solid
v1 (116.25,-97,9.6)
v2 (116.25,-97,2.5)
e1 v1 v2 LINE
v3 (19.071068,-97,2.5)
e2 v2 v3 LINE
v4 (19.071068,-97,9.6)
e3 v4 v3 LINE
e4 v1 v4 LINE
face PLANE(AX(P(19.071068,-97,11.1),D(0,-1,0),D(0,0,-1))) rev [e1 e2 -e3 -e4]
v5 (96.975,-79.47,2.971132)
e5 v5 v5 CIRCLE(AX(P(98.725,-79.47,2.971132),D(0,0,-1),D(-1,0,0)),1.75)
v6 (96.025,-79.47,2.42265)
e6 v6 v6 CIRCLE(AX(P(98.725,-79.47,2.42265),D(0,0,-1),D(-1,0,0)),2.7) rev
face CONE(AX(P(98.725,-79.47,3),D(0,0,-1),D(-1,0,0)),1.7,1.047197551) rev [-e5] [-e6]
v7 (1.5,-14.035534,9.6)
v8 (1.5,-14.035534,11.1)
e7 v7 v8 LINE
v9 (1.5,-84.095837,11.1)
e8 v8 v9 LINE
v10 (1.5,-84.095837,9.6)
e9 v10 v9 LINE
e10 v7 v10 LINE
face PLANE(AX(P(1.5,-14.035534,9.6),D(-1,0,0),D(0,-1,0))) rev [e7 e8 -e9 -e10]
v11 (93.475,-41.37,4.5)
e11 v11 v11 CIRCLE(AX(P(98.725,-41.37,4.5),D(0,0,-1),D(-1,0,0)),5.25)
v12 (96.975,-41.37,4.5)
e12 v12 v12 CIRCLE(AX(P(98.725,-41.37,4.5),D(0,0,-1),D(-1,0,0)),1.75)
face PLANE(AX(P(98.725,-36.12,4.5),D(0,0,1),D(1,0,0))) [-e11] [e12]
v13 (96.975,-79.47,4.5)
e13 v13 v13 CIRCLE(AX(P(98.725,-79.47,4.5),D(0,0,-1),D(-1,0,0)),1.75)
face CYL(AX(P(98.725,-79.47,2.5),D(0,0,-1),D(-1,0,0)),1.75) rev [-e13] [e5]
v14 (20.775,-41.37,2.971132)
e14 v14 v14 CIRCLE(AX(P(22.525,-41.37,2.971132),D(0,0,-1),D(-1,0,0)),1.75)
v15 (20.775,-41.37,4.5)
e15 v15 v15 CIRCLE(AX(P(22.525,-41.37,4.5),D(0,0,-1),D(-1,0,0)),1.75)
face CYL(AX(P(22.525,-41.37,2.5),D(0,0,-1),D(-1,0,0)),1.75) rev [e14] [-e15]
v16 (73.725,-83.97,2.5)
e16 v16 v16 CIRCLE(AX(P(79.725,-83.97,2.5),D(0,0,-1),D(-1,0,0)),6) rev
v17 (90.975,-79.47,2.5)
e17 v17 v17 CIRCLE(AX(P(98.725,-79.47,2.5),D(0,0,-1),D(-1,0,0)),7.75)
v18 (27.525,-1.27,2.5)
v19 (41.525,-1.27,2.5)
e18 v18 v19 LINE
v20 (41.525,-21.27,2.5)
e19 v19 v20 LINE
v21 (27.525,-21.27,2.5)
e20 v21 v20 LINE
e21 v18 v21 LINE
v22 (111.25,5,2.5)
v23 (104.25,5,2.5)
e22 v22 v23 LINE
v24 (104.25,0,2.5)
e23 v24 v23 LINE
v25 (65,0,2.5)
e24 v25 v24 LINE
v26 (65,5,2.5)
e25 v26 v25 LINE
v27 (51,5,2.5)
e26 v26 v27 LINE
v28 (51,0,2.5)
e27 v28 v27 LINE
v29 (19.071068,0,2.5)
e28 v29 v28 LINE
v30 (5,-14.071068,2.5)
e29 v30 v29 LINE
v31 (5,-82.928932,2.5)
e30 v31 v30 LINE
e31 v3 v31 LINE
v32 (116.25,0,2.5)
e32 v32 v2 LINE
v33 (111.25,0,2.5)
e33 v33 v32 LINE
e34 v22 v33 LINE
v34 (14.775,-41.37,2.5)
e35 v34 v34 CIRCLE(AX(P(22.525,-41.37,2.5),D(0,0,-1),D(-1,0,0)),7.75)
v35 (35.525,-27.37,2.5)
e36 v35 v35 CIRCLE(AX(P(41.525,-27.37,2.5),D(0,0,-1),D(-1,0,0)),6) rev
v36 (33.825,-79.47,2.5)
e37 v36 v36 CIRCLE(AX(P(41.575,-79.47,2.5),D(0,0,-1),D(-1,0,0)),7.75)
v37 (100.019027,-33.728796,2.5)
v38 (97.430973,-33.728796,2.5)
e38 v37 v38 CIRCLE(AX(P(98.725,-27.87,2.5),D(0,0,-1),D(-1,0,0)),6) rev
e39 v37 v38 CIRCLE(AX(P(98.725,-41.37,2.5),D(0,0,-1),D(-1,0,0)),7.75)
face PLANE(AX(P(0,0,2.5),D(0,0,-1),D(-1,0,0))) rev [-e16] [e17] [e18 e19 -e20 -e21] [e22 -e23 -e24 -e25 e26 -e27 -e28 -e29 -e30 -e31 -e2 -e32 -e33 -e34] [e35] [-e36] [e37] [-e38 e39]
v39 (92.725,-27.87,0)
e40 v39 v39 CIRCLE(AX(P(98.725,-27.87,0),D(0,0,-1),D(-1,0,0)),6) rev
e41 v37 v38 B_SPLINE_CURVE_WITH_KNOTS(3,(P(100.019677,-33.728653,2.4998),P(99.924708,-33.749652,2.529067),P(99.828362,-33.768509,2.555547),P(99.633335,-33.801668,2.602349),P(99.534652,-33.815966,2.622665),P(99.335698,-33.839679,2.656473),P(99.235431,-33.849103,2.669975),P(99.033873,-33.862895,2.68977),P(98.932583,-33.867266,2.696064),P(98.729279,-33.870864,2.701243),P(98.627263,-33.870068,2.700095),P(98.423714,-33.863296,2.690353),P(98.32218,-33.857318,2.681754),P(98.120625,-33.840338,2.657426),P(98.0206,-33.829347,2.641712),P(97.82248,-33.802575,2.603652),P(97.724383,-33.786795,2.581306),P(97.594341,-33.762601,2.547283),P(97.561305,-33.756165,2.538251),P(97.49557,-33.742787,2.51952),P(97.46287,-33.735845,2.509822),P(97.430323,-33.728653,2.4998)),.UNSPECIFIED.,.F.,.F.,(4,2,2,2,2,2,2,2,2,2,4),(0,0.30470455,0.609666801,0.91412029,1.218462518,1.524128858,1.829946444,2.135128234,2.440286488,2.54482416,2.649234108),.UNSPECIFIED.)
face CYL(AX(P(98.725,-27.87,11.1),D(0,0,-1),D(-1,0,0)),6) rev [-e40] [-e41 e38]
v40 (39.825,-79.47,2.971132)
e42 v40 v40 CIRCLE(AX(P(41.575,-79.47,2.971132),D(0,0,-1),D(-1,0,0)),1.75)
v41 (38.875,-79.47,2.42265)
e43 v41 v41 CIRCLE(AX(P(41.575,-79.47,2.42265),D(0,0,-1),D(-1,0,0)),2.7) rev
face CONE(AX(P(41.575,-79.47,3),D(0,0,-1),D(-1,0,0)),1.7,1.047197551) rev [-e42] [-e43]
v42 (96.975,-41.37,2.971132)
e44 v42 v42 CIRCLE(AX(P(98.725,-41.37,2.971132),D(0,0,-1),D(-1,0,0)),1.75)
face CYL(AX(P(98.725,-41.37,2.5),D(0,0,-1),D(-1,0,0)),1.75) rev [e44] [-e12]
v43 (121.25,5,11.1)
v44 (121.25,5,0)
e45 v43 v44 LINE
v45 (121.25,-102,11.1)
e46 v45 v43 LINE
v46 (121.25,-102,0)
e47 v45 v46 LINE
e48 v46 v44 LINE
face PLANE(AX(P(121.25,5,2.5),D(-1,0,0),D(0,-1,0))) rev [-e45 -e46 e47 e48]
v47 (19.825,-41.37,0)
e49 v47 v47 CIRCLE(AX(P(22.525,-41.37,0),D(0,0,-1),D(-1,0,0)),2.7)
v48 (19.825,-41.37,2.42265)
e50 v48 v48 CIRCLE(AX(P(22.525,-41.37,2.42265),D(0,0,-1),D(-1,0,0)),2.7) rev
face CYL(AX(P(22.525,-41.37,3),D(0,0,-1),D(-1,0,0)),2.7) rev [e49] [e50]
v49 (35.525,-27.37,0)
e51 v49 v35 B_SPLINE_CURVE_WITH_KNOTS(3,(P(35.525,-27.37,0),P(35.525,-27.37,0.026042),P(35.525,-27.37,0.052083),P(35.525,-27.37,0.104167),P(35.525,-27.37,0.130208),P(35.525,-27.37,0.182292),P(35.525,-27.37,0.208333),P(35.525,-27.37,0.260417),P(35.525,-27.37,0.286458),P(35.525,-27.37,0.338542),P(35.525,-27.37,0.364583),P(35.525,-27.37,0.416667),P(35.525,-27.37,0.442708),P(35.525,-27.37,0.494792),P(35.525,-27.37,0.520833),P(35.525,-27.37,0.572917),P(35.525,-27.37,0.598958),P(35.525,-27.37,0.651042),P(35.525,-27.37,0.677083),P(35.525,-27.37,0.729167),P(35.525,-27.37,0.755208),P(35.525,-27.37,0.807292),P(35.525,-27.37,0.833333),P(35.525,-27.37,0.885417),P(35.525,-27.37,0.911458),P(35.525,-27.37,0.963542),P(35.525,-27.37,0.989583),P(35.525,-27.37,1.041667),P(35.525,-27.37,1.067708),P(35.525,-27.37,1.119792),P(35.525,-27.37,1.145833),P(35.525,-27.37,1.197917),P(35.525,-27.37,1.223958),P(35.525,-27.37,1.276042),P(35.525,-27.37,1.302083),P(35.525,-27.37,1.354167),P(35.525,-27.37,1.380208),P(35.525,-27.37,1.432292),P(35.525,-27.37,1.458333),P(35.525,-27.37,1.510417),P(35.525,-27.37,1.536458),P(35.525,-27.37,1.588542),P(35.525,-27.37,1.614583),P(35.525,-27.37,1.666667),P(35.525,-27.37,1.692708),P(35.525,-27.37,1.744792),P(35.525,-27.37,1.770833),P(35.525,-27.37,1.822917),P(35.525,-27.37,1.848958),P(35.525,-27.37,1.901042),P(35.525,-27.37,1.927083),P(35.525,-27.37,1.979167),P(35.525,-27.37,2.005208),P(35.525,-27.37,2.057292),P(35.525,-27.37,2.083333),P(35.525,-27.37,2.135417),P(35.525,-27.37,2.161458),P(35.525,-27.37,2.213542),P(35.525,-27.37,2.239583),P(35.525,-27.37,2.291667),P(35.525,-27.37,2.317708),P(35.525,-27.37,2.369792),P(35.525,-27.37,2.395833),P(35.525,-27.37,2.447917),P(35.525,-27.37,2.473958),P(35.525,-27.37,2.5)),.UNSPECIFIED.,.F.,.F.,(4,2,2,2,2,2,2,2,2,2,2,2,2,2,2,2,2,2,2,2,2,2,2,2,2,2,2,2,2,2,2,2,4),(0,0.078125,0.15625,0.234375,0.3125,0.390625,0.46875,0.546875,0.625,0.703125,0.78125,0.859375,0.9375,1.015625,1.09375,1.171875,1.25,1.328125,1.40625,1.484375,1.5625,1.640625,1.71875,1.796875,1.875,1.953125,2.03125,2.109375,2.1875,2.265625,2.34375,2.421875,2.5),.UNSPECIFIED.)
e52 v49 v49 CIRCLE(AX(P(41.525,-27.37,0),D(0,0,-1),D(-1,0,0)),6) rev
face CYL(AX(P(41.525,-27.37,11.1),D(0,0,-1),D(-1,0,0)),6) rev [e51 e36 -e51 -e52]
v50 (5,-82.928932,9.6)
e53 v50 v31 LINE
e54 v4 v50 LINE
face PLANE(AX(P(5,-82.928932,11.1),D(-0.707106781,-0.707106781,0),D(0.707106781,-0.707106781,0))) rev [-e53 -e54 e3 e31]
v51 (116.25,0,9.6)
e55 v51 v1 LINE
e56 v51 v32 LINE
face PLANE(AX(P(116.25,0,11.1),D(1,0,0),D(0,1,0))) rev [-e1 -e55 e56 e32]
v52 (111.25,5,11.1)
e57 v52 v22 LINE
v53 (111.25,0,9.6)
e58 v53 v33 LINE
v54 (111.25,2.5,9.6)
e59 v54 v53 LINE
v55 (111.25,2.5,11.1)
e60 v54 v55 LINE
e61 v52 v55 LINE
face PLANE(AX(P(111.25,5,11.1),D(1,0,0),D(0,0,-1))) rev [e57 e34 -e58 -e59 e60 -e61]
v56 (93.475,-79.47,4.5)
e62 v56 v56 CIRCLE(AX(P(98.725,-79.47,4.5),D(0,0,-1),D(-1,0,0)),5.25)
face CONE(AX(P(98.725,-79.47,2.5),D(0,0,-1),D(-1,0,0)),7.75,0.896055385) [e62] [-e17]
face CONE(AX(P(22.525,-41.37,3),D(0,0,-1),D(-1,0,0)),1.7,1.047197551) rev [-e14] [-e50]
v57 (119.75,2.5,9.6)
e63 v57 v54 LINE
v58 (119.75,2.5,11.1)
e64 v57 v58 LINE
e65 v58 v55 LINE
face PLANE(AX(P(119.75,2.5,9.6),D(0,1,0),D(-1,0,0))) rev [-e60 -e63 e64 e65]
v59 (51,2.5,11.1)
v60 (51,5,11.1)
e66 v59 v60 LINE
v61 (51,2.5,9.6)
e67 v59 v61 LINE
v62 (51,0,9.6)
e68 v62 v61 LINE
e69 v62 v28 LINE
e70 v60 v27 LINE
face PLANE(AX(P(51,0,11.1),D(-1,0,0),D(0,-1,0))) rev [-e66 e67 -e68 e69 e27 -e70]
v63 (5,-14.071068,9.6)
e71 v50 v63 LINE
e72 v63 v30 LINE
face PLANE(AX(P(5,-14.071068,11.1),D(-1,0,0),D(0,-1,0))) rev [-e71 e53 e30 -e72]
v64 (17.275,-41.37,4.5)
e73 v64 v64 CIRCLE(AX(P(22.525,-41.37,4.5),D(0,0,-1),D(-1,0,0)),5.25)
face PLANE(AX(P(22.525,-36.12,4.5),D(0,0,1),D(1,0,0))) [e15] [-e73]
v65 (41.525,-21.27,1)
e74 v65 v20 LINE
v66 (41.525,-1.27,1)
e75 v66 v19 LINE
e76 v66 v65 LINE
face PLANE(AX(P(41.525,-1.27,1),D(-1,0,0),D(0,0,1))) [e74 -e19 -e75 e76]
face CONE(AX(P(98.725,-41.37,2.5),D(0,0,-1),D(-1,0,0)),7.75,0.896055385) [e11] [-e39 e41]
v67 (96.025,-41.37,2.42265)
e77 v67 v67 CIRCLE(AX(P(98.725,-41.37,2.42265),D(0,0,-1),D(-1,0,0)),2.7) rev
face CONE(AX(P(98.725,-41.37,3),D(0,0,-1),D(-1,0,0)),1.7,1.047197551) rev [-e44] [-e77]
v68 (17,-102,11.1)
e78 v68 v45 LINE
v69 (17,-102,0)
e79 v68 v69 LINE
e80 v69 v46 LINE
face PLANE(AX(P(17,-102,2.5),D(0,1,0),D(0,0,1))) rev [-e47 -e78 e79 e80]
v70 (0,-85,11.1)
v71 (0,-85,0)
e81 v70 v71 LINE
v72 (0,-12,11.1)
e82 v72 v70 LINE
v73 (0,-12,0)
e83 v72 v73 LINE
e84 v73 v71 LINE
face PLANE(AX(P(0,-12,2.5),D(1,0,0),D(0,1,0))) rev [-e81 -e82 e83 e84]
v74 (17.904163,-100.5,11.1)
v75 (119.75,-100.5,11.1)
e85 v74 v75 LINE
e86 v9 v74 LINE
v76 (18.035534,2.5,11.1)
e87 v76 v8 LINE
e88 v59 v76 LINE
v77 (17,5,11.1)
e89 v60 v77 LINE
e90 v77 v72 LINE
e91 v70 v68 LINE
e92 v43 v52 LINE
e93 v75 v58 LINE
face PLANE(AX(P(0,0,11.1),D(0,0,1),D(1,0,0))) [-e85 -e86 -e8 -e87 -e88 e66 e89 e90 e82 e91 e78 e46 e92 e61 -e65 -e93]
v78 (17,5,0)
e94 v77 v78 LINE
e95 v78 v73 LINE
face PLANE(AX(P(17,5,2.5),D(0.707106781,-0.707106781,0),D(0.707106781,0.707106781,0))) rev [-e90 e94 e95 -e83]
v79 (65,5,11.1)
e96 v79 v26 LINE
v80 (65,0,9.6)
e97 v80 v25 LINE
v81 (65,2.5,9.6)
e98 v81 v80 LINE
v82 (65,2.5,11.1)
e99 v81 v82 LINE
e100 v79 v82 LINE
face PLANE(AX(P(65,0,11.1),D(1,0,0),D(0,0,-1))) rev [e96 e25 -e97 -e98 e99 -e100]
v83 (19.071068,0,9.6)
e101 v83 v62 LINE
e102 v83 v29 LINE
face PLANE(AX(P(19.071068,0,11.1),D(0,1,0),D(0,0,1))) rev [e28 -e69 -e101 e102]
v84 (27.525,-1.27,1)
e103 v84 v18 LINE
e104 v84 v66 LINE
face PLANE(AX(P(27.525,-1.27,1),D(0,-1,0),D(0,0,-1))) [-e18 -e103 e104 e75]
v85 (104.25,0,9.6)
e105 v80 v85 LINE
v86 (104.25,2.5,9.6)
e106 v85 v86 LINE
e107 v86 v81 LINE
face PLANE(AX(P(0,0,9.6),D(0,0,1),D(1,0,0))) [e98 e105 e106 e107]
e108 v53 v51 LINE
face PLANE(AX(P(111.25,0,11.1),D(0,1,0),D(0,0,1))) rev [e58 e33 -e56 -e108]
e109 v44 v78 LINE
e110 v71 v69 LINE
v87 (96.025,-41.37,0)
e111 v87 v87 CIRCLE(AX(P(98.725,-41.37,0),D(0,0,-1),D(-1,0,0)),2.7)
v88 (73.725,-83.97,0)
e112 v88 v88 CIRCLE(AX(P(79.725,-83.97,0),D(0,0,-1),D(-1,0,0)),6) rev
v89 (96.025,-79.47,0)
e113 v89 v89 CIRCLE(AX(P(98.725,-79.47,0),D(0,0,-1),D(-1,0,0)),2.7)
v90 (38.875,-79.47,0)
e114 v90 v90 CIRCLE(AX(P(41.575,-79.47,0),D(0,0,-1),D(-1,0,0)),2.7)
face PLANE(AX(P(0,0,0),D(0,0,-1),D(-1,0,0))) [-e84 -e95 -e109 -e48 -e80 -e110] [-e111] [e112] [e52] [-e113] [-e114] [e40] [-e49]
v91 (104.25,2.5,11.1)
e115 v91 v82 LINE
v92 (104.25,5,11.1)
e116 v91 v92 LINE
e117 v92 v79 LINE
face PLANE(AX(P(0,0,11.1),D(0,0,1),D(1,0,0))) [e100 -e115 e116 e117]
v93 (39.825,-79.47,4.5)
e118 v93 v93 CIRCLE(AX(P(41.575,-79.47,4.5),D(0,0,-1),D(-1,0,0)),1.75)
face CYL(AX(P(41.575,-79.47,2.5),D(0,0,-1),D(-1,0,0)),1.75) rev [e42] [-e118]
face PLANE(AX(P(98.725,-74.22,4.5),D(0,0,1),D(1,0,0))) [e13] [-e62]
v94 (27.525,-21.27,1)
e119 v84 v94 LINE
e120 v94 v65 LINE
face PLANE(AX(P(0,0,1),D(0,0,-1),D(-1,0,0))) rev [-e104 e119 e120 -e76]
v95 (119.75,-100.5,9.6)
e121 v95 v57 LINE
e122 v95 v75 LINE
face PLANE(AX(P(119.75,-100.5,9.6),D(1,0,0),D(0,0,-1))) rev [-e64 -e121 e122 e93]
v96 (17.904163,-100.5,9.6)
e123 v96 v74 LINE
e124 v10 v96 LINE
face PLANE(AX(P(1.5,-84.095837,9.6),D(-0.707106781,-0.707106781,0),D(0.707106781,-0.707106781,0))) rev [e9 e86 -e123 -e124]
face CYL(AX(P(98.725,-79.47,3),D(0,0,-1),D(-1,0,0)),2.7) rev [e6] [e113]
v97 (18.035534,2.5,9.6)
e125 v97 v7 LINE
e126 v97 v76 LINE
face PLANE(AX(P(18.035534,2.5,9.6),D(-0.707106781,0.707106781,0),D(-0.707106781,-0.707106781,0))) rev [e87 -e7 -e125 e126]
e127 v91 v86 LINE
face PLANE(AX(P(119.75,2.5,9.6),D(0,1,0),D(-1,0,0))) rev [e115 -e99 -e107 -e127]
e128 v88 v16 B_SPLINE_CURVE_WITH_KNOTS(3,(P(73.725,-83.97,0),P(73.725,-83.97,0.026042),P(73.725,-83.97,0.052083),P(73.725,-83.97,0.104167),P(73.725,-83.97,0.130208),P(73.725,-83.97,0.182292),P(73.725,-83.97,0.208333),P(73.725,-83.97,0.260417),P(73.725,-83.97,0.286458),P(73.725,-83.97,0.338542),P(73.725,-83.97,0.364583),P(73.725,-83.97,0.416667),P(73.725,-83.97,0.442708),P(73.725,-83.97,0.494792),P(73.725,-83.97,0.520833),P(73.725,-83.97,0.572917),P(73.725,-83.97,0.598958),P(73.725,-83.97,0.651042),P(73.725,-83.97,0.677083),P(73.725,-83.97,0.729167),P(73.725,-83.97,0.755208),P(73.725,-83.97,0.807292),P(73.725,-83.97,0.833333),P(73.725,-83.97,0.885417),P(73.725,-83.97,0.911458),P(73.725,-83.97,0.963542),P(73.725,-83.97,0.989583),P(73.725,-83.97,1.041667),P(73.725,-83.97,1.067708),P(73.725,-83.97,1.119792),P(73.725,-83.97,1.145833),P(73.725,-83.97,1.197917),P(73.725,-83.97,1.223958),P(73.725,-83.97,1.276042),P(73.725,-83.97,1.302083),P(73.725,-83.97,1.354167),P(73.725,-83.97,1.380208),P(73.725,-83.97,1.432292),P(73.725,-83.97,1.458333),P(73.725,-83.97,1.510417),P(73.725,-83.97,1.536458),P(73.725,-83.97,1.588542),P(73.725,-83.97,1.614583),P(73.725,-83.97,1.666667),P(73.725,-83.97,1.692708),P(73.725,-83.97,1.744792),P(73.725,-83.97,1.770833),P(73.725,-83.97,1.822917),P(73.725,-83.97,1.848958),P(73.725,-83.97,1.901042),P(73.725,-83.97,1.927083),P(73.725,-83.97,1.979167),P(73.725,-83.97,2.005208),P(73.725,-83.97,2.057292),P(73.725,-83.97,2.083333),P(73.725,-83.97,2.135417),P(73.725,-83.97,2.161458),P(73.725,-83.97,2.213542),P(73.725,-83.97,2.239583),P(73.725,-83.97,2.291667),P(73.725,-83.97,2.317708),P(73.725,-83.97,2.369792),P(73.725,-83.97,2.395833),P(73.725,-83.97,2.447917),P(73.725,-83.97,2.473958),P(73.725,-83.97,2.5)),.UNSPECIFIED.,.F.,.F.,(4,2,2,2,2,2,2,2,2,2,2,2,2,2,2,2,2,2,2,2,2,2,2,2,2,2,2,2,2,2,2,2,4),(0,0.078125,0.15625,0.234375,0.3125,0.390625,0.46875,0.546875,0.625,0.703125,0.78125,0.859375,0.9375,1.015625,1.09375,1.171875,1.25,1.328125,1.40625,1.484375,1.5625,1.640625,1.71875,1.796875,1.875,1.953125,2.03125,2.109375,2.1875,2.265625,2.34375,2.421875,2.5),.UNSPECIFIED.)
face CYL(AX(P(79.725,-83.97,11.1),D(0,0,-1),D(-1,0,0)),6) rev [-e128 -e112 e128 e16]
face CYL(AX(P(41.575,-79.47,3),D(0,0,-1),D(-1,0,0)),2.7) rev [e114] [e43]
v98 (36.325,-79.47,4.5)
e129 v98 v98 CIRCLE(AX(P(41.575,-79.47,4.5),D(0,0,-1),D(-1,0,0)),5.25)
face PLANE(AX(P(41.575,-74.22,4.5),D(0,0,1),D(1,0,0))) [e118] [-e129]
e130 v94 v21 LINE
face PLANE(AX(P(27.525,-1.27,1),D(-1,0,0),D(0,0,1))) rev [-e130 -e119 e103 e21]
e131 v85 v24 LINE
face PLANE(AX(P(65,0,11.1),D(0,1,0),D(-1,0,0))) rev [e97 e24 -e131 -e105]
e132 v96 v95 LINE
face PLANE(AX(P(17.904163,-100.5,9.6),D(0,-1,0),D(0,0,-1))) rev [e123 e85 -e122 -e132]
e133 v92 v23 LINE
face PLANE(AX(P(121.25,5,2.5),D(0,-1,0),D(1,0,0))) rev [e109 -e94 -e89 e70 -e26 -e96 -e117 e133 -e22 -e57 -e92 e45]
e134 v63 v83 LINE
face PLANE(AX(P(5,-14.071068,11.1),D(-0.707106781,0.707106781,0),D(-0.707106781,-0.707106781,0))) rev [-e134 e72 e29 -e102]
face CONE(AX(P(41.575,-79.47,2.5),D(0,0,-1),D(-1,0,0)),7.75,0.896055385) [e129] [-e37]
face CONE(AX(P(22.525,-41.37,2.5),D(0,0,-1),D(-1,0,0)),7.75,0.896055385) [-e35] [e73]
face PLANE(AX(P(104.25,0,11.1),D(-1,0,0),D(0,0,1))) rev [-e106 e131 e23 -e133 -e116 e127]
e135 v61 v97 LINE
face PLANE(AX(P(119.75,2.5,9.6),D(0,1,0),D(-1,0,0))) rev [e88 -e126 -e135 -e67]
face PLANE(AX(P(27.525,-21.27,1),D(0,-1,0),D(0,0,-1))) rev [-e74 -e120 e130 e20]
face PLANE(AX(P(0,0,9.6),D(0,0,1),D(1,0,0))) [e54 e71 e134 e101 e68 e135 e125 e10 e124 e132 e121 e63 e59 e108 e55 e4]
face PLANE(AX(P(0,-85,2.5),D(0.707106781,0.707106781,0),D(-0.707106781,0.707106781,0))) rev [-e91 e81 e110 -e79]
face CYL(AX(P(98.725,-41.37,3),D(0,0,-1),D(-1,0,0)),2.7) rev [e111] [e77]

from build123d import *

# Parameters (mm, degrees)
BOSS_EXTRU_1_DEPTH           = 2.5
ESQUISSE2_W                  = 39.25
ESQUISSE2_H                  = 5
BOSS_EXTRU_2_DEPTH           = 8.6
ESQUISSE16_W                 = 1.8
ESQUISSE16_H                 = 2.5
D_GAGEMENT_M32_AT_2_COUNT    = 2
D_GAGEMENT_M32_AT_2_PITCH    = 42.597094971
D_GAGEMENT_M32_AT_3_COUNT    = 2
D_GAGEMENT_M32_AT_3_PITCH    = 76.2
D_GAGEMENT_M32_AT_4_COUNT    = 2
D_GAGEMENT_M32_AT_4_PITCH    = 85.194189943
ESQUISSE18_R                 = 2.7
ENL_V_MAT_EXTRU_2_DEPTH      = 3
ENL_V_MAT_EXTRU_3_DEPTH      = 1.5
ENL_V_MAT_EXTRU_4_DEPTH      = 159.680567493
ENL_V_MAT_EXTRU_4_DEPTH_BACK = 10
ESQUISSE21_R                 = 6
CHANFREIN2_SIZE              = 0.577350269
CHANFREIN2_SIZE_2            = 1
ESQUISSE22_W                 = 14
ESQUISSE22_H                 = 20
ENL_V_MAT_EXTRU_13_DEPTH     = 1.5


with BuildPart() as part:
    # Esquisse1 → Boss.-Extru.1 (new body)
    with BuildSketch(Plane.XY):
        Polygon((0, -85), (17, -102), (121.25, -102), (121.25, 5), (17, 5), (0, -12), align=None)
    extrude(amount=BOSS_EXTRU_1_DEPTH)

    # Esquisse2 → Boss.-Extru.2 (add)
    with BuildSketch(Plane.XY.offset(2.5)):
        Polygon((5, -82.928932188), (19.071067812, -97), (116.25, -97), (116.25, 0), (111.25, 0), (111.25, 5), (121.25, 5), (121.25, -102), (17, -102), (0, -85), (0, -12), (17, 5), (51, 5), (51, 0), (19.071067812, 0), (5, -14.071067812), align=None)
        with Locations((84.625, 2.5)):
            Rectangle(ESQUISSE2_W, ESQUISSE2_H)
    extrude(amount=BOSS_EXTRU_2_DEPTH)

    # Esquisse8 → Révolution3 (revolve)
    with BuildSketch(Plane(origin=(98.725, -41.37, 2.5), x_dir=(0, 0, -1), z_dir=(1, 0, 0)), mode=Mode.PRIVATE) as r_volution3_sk:
        Polygon((0, 1.75), (0, 7.75), (-2, 5.25), (-2, 1.75), align=None)
    revolve(r_volution3_sk.sketch.rotate(Axis((98.725, -41.37, 2.5), (0, 0, 1)), 90), axis=Axis((98.725, -41.37, 2.5), (0, 0, 1)))

    # Esquisse9 → Révolution4 (revolve)
    with BuildSketch(Plane(origin=(41.575, -79.47, 2.5), x_dir=(0, 0, -1), z_dir=(1, 0, 0)), mode=Mode.PRIVATE) as r_volution4_sk:
        Polygon((0, 1.75), (0, 7.75), (-2, 5.25), (-2, 1.75), align=None)
    revolve(r_volution4_sk.sketch.rotate(Axis((41.575, -79.47, 2.5), (0, 0, 1)), 90), axis=Axis((41.575, -79.47, 2.5), (0, 0, 1)))

    # Esquisse10 → Révolution5 (revolve)
    with BuildSketch(Plane(origin=(98.725, -79.47, 2.5), x_dir=(0, 0, -1), z_dir=(1, 0, 0)), mode=Mode.PRIVATE) as r_volution5_sk:
        Polygon((0, 1.75), (0, 7.75), (-2, 5.25), (-2, 1.75), align=None)
    revolve(r_volution5_sk.sketch.rotate(Axis((98.725, -79.47, 2.5), (0, 0, 1)), 90), axis=Axis((98.725, -79.47, 2.5), (0, 0, 1)))

    # Esquisse16 → Dégagement M32 (revolve, cut)
    with BuildSketch(Plane(origin=(22.525, -41.37, 2.5), x_dir=(0, -1, 0), z_dir=(1, 0, 0))):
        with Locations((0.9, 1.25)):
            Rectangle(ESQUISSE16_W, ESQUISSE16_H)
    d_gagement_m32 = revolve(axis=Axis((22.525, -41.37, 8.85), (0, 0, -1)), mode=Mode.SUBTRACT)

    # Dégagement M32 at 2: Dégagement M32 ×2
    with Locations(*[Vector(0.4472135954999577, -0.8944271909999161, 0) * (i * D_GAGEMENT_M32_AT_2_PITCH) for i in range(1, D_GAGEMENT_M32_AT_2_COUNT)]):
        add(d_gagement_m32, mode=Mode.SUBTRACT)

    # Dégagement M32 at 3: Dégagement M32 ×2
    with Locations(*[(i * D_GAGEMENT_M32_AT_3_PITCH, 0, 0) for i in range(1, D_GAGEMENT_M32_AT_3_COUNT)]):
        add(d_gagement_m32, mode=Mode.SUBTRACT)

    # Dégagement M32 at 4: Dégagement M32 ×2
    with Locations(*[Vector(0.8944271909999159, -0.44721359549995804, 0) * (i * D_GAGEMENT_M32_AT_4_PITCH) for i in range(1, D_GAGEMENT_M32_AT_4_COUNT)]):
        add(d_gagement_m32, mode=Mode.SUBTRACT)

    # Esquisse17 → Révolution6 (revolve)
    with BuildSketch(Plane(origin=(22.525, -41.37, 2.5), x_dir=(0, 0, -1), z_dir=(1, 0, 0)), mode=Mode.PRIVATE) as r_volution6_sk:
        Polygon((0, 1.75), (0, 7.75), (-2, 5.25), (-2, 1.75), align=None)
    revolve(r_volution6_sk.sketch.rotate(Axis((22.525, -41.37, 2.5), (0, 0, 1)), 90), axis=Axis((22.525, -41.37, 2.5), (0, 0, 1)))

    # Esquisse18 → Enlèv. mat.-Extru.2 (cut)
    with BuildSketch(Plane(origin=(0, 0, 0), x_dir=(-1, 0, 0), z_dir=(0, 0, -1))):
        with Locations((-22.525, -41.37)):
            Circle(ESQUISSE18_R)
        with Locations((-98.725, -41.37)):
            Circle(ESQUISSE18_R)
        with Locations((-41.575, -79.47)):
            Circle(ESQUISSE18_R)
        with Locations((-98.725, -79.47)):
            Circle(ESQUISSE18_R)
    extrude(amount=-ENL_V_MAT_EXTRU_2_DEPTH, mode=Mode.SUBTRACT)

    # Esquisse20 → Enlèv. mat.-Extru.3 (cut)
    with BuildSketch(Plane.XY.offset(11.1)):
        Polygon((119.75, 2.5), (18.035533906, 2.5), (1.5, -14.035533906), (1.5, -84.095836944), (17.904163056, -100.5), (119.75, -100.5), align=None)
    extrude(amount=-ENL_V_MAT_EXTRU_3_DEPTH, mode=Mode.SUBTRACT)

    # Esquisse21 → Enlèv. mat.-Extru.4 (cut, two sides: drawn at the far end of the back side and taken through both)
    with BuildSketch(Plane.XY.offset(2.5).offset(-ENL_V_MAT_EXTRU_4_DEPTH_BACK)):
        with Locations(Location((98.725, -27.87, 0), (0, 0, 180))):
            Circle(ESQUISSE21_R)
        with Locations(Location((41.525, -27.37, 0), (0, 0, 180))):
            Circle(ESQUISSE21_R)
        with Locations(Location((79.725, -83.97, 0), (0, 0, 180))):
            Circle(ESQUISSE21_R)
    extrude(amount=ENL_V_MAT_EXTRU_4_DEPTH + ENL_V_MAT_EXTRU_4_DEPTH_BACK, mode=Mode.SUBTRACT)

    # Chanfrein2
    # the kernel refuses this chamfer: 1, 0.577350269 mm, written as the material it adds along each edge
    with BuildSketch(Plane(origin=(98.725, -79.47, 3), x_dir=(-1, 0, 0), z_dir=(0, -1, 0))) as chanfrein2_piece_1_section:
        Polygon((2.7, CHANFREIN2_SIZE), (2.7 - CHANFREIN2_SIZE_2, 0), (2.7, 0), align=None)
    chanfrein2_piece_1 = revolve(axis=Axis((98.725, -79.47, 3), (0, 0, -1)), mode=Mode.PRIVATE)
    chanfrein2_piece_1 = chanfrein2_piece_1 - Plane(origin=(98.725, -79.47, 2.701530762), x_dir=(-1, 0, 0), z_dir=(0, 0, -1)) * Cylinder(1.75, 11, mode=Mode.PRIVATE)
    add(chanfrein2_piece_1)
    with BuildSketch(Plane(origin=(41.575, -79.47, 3), x_dir=(-1, 0, 0), z_dir=(0, -1, 0))) as chanfrein2_piece_2_section:
        Polygon((2.7, CHANFREIN2_SIZE), (2.7 - CHANFREIN2_SIZE_2, 0), (2.7, 0), align=None)
    chanfrein2_piece_2 = revolve(axis=Axis((41.575, -79.47, 3), (0, 0, -1)), mode=Mode.PRIVATE)
    chanfrein2_piece_2 = chanfrein2_piece_2 - Plane(origin=(41.575, -79.47, 2.701530762), x_dir=(-1, 0, 0), z_dir=(0, 0, -1)) * Cylinder(1.75, 11, mode=Mode.PRIVATE)
    add(chanfrein2_piece_2)
    with BuildSketch(Plane(origin=(22.525, -41.37, 3), x_dir=(-1, 0, 0), z_dir=(0, -1, 0))) as chanfrein2_piece_3_section:
        Polygon((2.7, CHANFREIN2_SIZE), (2.7 - CHANFREIN2_SIZE_2, 0), (2.7, 0), align=None)
    chanfrein2_piece_3 = revolve(axis=Axis((22.525, -41.37, 3), (0, 0, -1)), mode=Mode.PRIVATE)
    chanfrein2_piece_3 = chanfrein2_piece_3 - Plane(origin=(22.525, -41.37, 2.701530762), x_dir=(-1, 0, 0), z_dir=(0, 0, -1)) * Cylinder(1.75, 11, mode=Mode.PRIVATE)
    add(chanfrein2_piece_3)
    with BuildSketch(Plane(origin=(98.725, -41.37, 3), x_dir=(-1, 0, 0), z_dir=(0, -1, 0))) as chanfrein2_piece_4_section:
        Polygon((2.7, CHANFREIN2_SIZE), (2.7 - CHANFREIN2_SIZE_2, 0), (2.7, 0), align=None)
    chanfrein2_piece_4 = revolve(axis=Axis((98.725, -41.37, 3), (0, 0, -1)), mode=Mode.PRIVATE)
    chanfrein2_piece_4 = chanfrein2_piece_4 - Plane(origin=(98.725, -41.37, 2.701530762), x_dir=(-1, 0, 0), z_dir=(0, 0, -1)) * Cylinder(1.75, 11, mode=Mode.PRIVATE)
    add(chanfrein2_piece_4)

    # Esquisse22 → Enlèv. mat.-Extru.13 (cut)
    with BuildSketch(Plane.XY.offset(2.5)):
        with Locations((34.525, -11.27)):
            Rectangle(ESQUISSE22_W, ESQUISSE22_H)
    extrude(amount=-ENL_V_MAT_EXTRU_13_DEPTH, mode=Mode.SUBTRACT)


solid = part.part
